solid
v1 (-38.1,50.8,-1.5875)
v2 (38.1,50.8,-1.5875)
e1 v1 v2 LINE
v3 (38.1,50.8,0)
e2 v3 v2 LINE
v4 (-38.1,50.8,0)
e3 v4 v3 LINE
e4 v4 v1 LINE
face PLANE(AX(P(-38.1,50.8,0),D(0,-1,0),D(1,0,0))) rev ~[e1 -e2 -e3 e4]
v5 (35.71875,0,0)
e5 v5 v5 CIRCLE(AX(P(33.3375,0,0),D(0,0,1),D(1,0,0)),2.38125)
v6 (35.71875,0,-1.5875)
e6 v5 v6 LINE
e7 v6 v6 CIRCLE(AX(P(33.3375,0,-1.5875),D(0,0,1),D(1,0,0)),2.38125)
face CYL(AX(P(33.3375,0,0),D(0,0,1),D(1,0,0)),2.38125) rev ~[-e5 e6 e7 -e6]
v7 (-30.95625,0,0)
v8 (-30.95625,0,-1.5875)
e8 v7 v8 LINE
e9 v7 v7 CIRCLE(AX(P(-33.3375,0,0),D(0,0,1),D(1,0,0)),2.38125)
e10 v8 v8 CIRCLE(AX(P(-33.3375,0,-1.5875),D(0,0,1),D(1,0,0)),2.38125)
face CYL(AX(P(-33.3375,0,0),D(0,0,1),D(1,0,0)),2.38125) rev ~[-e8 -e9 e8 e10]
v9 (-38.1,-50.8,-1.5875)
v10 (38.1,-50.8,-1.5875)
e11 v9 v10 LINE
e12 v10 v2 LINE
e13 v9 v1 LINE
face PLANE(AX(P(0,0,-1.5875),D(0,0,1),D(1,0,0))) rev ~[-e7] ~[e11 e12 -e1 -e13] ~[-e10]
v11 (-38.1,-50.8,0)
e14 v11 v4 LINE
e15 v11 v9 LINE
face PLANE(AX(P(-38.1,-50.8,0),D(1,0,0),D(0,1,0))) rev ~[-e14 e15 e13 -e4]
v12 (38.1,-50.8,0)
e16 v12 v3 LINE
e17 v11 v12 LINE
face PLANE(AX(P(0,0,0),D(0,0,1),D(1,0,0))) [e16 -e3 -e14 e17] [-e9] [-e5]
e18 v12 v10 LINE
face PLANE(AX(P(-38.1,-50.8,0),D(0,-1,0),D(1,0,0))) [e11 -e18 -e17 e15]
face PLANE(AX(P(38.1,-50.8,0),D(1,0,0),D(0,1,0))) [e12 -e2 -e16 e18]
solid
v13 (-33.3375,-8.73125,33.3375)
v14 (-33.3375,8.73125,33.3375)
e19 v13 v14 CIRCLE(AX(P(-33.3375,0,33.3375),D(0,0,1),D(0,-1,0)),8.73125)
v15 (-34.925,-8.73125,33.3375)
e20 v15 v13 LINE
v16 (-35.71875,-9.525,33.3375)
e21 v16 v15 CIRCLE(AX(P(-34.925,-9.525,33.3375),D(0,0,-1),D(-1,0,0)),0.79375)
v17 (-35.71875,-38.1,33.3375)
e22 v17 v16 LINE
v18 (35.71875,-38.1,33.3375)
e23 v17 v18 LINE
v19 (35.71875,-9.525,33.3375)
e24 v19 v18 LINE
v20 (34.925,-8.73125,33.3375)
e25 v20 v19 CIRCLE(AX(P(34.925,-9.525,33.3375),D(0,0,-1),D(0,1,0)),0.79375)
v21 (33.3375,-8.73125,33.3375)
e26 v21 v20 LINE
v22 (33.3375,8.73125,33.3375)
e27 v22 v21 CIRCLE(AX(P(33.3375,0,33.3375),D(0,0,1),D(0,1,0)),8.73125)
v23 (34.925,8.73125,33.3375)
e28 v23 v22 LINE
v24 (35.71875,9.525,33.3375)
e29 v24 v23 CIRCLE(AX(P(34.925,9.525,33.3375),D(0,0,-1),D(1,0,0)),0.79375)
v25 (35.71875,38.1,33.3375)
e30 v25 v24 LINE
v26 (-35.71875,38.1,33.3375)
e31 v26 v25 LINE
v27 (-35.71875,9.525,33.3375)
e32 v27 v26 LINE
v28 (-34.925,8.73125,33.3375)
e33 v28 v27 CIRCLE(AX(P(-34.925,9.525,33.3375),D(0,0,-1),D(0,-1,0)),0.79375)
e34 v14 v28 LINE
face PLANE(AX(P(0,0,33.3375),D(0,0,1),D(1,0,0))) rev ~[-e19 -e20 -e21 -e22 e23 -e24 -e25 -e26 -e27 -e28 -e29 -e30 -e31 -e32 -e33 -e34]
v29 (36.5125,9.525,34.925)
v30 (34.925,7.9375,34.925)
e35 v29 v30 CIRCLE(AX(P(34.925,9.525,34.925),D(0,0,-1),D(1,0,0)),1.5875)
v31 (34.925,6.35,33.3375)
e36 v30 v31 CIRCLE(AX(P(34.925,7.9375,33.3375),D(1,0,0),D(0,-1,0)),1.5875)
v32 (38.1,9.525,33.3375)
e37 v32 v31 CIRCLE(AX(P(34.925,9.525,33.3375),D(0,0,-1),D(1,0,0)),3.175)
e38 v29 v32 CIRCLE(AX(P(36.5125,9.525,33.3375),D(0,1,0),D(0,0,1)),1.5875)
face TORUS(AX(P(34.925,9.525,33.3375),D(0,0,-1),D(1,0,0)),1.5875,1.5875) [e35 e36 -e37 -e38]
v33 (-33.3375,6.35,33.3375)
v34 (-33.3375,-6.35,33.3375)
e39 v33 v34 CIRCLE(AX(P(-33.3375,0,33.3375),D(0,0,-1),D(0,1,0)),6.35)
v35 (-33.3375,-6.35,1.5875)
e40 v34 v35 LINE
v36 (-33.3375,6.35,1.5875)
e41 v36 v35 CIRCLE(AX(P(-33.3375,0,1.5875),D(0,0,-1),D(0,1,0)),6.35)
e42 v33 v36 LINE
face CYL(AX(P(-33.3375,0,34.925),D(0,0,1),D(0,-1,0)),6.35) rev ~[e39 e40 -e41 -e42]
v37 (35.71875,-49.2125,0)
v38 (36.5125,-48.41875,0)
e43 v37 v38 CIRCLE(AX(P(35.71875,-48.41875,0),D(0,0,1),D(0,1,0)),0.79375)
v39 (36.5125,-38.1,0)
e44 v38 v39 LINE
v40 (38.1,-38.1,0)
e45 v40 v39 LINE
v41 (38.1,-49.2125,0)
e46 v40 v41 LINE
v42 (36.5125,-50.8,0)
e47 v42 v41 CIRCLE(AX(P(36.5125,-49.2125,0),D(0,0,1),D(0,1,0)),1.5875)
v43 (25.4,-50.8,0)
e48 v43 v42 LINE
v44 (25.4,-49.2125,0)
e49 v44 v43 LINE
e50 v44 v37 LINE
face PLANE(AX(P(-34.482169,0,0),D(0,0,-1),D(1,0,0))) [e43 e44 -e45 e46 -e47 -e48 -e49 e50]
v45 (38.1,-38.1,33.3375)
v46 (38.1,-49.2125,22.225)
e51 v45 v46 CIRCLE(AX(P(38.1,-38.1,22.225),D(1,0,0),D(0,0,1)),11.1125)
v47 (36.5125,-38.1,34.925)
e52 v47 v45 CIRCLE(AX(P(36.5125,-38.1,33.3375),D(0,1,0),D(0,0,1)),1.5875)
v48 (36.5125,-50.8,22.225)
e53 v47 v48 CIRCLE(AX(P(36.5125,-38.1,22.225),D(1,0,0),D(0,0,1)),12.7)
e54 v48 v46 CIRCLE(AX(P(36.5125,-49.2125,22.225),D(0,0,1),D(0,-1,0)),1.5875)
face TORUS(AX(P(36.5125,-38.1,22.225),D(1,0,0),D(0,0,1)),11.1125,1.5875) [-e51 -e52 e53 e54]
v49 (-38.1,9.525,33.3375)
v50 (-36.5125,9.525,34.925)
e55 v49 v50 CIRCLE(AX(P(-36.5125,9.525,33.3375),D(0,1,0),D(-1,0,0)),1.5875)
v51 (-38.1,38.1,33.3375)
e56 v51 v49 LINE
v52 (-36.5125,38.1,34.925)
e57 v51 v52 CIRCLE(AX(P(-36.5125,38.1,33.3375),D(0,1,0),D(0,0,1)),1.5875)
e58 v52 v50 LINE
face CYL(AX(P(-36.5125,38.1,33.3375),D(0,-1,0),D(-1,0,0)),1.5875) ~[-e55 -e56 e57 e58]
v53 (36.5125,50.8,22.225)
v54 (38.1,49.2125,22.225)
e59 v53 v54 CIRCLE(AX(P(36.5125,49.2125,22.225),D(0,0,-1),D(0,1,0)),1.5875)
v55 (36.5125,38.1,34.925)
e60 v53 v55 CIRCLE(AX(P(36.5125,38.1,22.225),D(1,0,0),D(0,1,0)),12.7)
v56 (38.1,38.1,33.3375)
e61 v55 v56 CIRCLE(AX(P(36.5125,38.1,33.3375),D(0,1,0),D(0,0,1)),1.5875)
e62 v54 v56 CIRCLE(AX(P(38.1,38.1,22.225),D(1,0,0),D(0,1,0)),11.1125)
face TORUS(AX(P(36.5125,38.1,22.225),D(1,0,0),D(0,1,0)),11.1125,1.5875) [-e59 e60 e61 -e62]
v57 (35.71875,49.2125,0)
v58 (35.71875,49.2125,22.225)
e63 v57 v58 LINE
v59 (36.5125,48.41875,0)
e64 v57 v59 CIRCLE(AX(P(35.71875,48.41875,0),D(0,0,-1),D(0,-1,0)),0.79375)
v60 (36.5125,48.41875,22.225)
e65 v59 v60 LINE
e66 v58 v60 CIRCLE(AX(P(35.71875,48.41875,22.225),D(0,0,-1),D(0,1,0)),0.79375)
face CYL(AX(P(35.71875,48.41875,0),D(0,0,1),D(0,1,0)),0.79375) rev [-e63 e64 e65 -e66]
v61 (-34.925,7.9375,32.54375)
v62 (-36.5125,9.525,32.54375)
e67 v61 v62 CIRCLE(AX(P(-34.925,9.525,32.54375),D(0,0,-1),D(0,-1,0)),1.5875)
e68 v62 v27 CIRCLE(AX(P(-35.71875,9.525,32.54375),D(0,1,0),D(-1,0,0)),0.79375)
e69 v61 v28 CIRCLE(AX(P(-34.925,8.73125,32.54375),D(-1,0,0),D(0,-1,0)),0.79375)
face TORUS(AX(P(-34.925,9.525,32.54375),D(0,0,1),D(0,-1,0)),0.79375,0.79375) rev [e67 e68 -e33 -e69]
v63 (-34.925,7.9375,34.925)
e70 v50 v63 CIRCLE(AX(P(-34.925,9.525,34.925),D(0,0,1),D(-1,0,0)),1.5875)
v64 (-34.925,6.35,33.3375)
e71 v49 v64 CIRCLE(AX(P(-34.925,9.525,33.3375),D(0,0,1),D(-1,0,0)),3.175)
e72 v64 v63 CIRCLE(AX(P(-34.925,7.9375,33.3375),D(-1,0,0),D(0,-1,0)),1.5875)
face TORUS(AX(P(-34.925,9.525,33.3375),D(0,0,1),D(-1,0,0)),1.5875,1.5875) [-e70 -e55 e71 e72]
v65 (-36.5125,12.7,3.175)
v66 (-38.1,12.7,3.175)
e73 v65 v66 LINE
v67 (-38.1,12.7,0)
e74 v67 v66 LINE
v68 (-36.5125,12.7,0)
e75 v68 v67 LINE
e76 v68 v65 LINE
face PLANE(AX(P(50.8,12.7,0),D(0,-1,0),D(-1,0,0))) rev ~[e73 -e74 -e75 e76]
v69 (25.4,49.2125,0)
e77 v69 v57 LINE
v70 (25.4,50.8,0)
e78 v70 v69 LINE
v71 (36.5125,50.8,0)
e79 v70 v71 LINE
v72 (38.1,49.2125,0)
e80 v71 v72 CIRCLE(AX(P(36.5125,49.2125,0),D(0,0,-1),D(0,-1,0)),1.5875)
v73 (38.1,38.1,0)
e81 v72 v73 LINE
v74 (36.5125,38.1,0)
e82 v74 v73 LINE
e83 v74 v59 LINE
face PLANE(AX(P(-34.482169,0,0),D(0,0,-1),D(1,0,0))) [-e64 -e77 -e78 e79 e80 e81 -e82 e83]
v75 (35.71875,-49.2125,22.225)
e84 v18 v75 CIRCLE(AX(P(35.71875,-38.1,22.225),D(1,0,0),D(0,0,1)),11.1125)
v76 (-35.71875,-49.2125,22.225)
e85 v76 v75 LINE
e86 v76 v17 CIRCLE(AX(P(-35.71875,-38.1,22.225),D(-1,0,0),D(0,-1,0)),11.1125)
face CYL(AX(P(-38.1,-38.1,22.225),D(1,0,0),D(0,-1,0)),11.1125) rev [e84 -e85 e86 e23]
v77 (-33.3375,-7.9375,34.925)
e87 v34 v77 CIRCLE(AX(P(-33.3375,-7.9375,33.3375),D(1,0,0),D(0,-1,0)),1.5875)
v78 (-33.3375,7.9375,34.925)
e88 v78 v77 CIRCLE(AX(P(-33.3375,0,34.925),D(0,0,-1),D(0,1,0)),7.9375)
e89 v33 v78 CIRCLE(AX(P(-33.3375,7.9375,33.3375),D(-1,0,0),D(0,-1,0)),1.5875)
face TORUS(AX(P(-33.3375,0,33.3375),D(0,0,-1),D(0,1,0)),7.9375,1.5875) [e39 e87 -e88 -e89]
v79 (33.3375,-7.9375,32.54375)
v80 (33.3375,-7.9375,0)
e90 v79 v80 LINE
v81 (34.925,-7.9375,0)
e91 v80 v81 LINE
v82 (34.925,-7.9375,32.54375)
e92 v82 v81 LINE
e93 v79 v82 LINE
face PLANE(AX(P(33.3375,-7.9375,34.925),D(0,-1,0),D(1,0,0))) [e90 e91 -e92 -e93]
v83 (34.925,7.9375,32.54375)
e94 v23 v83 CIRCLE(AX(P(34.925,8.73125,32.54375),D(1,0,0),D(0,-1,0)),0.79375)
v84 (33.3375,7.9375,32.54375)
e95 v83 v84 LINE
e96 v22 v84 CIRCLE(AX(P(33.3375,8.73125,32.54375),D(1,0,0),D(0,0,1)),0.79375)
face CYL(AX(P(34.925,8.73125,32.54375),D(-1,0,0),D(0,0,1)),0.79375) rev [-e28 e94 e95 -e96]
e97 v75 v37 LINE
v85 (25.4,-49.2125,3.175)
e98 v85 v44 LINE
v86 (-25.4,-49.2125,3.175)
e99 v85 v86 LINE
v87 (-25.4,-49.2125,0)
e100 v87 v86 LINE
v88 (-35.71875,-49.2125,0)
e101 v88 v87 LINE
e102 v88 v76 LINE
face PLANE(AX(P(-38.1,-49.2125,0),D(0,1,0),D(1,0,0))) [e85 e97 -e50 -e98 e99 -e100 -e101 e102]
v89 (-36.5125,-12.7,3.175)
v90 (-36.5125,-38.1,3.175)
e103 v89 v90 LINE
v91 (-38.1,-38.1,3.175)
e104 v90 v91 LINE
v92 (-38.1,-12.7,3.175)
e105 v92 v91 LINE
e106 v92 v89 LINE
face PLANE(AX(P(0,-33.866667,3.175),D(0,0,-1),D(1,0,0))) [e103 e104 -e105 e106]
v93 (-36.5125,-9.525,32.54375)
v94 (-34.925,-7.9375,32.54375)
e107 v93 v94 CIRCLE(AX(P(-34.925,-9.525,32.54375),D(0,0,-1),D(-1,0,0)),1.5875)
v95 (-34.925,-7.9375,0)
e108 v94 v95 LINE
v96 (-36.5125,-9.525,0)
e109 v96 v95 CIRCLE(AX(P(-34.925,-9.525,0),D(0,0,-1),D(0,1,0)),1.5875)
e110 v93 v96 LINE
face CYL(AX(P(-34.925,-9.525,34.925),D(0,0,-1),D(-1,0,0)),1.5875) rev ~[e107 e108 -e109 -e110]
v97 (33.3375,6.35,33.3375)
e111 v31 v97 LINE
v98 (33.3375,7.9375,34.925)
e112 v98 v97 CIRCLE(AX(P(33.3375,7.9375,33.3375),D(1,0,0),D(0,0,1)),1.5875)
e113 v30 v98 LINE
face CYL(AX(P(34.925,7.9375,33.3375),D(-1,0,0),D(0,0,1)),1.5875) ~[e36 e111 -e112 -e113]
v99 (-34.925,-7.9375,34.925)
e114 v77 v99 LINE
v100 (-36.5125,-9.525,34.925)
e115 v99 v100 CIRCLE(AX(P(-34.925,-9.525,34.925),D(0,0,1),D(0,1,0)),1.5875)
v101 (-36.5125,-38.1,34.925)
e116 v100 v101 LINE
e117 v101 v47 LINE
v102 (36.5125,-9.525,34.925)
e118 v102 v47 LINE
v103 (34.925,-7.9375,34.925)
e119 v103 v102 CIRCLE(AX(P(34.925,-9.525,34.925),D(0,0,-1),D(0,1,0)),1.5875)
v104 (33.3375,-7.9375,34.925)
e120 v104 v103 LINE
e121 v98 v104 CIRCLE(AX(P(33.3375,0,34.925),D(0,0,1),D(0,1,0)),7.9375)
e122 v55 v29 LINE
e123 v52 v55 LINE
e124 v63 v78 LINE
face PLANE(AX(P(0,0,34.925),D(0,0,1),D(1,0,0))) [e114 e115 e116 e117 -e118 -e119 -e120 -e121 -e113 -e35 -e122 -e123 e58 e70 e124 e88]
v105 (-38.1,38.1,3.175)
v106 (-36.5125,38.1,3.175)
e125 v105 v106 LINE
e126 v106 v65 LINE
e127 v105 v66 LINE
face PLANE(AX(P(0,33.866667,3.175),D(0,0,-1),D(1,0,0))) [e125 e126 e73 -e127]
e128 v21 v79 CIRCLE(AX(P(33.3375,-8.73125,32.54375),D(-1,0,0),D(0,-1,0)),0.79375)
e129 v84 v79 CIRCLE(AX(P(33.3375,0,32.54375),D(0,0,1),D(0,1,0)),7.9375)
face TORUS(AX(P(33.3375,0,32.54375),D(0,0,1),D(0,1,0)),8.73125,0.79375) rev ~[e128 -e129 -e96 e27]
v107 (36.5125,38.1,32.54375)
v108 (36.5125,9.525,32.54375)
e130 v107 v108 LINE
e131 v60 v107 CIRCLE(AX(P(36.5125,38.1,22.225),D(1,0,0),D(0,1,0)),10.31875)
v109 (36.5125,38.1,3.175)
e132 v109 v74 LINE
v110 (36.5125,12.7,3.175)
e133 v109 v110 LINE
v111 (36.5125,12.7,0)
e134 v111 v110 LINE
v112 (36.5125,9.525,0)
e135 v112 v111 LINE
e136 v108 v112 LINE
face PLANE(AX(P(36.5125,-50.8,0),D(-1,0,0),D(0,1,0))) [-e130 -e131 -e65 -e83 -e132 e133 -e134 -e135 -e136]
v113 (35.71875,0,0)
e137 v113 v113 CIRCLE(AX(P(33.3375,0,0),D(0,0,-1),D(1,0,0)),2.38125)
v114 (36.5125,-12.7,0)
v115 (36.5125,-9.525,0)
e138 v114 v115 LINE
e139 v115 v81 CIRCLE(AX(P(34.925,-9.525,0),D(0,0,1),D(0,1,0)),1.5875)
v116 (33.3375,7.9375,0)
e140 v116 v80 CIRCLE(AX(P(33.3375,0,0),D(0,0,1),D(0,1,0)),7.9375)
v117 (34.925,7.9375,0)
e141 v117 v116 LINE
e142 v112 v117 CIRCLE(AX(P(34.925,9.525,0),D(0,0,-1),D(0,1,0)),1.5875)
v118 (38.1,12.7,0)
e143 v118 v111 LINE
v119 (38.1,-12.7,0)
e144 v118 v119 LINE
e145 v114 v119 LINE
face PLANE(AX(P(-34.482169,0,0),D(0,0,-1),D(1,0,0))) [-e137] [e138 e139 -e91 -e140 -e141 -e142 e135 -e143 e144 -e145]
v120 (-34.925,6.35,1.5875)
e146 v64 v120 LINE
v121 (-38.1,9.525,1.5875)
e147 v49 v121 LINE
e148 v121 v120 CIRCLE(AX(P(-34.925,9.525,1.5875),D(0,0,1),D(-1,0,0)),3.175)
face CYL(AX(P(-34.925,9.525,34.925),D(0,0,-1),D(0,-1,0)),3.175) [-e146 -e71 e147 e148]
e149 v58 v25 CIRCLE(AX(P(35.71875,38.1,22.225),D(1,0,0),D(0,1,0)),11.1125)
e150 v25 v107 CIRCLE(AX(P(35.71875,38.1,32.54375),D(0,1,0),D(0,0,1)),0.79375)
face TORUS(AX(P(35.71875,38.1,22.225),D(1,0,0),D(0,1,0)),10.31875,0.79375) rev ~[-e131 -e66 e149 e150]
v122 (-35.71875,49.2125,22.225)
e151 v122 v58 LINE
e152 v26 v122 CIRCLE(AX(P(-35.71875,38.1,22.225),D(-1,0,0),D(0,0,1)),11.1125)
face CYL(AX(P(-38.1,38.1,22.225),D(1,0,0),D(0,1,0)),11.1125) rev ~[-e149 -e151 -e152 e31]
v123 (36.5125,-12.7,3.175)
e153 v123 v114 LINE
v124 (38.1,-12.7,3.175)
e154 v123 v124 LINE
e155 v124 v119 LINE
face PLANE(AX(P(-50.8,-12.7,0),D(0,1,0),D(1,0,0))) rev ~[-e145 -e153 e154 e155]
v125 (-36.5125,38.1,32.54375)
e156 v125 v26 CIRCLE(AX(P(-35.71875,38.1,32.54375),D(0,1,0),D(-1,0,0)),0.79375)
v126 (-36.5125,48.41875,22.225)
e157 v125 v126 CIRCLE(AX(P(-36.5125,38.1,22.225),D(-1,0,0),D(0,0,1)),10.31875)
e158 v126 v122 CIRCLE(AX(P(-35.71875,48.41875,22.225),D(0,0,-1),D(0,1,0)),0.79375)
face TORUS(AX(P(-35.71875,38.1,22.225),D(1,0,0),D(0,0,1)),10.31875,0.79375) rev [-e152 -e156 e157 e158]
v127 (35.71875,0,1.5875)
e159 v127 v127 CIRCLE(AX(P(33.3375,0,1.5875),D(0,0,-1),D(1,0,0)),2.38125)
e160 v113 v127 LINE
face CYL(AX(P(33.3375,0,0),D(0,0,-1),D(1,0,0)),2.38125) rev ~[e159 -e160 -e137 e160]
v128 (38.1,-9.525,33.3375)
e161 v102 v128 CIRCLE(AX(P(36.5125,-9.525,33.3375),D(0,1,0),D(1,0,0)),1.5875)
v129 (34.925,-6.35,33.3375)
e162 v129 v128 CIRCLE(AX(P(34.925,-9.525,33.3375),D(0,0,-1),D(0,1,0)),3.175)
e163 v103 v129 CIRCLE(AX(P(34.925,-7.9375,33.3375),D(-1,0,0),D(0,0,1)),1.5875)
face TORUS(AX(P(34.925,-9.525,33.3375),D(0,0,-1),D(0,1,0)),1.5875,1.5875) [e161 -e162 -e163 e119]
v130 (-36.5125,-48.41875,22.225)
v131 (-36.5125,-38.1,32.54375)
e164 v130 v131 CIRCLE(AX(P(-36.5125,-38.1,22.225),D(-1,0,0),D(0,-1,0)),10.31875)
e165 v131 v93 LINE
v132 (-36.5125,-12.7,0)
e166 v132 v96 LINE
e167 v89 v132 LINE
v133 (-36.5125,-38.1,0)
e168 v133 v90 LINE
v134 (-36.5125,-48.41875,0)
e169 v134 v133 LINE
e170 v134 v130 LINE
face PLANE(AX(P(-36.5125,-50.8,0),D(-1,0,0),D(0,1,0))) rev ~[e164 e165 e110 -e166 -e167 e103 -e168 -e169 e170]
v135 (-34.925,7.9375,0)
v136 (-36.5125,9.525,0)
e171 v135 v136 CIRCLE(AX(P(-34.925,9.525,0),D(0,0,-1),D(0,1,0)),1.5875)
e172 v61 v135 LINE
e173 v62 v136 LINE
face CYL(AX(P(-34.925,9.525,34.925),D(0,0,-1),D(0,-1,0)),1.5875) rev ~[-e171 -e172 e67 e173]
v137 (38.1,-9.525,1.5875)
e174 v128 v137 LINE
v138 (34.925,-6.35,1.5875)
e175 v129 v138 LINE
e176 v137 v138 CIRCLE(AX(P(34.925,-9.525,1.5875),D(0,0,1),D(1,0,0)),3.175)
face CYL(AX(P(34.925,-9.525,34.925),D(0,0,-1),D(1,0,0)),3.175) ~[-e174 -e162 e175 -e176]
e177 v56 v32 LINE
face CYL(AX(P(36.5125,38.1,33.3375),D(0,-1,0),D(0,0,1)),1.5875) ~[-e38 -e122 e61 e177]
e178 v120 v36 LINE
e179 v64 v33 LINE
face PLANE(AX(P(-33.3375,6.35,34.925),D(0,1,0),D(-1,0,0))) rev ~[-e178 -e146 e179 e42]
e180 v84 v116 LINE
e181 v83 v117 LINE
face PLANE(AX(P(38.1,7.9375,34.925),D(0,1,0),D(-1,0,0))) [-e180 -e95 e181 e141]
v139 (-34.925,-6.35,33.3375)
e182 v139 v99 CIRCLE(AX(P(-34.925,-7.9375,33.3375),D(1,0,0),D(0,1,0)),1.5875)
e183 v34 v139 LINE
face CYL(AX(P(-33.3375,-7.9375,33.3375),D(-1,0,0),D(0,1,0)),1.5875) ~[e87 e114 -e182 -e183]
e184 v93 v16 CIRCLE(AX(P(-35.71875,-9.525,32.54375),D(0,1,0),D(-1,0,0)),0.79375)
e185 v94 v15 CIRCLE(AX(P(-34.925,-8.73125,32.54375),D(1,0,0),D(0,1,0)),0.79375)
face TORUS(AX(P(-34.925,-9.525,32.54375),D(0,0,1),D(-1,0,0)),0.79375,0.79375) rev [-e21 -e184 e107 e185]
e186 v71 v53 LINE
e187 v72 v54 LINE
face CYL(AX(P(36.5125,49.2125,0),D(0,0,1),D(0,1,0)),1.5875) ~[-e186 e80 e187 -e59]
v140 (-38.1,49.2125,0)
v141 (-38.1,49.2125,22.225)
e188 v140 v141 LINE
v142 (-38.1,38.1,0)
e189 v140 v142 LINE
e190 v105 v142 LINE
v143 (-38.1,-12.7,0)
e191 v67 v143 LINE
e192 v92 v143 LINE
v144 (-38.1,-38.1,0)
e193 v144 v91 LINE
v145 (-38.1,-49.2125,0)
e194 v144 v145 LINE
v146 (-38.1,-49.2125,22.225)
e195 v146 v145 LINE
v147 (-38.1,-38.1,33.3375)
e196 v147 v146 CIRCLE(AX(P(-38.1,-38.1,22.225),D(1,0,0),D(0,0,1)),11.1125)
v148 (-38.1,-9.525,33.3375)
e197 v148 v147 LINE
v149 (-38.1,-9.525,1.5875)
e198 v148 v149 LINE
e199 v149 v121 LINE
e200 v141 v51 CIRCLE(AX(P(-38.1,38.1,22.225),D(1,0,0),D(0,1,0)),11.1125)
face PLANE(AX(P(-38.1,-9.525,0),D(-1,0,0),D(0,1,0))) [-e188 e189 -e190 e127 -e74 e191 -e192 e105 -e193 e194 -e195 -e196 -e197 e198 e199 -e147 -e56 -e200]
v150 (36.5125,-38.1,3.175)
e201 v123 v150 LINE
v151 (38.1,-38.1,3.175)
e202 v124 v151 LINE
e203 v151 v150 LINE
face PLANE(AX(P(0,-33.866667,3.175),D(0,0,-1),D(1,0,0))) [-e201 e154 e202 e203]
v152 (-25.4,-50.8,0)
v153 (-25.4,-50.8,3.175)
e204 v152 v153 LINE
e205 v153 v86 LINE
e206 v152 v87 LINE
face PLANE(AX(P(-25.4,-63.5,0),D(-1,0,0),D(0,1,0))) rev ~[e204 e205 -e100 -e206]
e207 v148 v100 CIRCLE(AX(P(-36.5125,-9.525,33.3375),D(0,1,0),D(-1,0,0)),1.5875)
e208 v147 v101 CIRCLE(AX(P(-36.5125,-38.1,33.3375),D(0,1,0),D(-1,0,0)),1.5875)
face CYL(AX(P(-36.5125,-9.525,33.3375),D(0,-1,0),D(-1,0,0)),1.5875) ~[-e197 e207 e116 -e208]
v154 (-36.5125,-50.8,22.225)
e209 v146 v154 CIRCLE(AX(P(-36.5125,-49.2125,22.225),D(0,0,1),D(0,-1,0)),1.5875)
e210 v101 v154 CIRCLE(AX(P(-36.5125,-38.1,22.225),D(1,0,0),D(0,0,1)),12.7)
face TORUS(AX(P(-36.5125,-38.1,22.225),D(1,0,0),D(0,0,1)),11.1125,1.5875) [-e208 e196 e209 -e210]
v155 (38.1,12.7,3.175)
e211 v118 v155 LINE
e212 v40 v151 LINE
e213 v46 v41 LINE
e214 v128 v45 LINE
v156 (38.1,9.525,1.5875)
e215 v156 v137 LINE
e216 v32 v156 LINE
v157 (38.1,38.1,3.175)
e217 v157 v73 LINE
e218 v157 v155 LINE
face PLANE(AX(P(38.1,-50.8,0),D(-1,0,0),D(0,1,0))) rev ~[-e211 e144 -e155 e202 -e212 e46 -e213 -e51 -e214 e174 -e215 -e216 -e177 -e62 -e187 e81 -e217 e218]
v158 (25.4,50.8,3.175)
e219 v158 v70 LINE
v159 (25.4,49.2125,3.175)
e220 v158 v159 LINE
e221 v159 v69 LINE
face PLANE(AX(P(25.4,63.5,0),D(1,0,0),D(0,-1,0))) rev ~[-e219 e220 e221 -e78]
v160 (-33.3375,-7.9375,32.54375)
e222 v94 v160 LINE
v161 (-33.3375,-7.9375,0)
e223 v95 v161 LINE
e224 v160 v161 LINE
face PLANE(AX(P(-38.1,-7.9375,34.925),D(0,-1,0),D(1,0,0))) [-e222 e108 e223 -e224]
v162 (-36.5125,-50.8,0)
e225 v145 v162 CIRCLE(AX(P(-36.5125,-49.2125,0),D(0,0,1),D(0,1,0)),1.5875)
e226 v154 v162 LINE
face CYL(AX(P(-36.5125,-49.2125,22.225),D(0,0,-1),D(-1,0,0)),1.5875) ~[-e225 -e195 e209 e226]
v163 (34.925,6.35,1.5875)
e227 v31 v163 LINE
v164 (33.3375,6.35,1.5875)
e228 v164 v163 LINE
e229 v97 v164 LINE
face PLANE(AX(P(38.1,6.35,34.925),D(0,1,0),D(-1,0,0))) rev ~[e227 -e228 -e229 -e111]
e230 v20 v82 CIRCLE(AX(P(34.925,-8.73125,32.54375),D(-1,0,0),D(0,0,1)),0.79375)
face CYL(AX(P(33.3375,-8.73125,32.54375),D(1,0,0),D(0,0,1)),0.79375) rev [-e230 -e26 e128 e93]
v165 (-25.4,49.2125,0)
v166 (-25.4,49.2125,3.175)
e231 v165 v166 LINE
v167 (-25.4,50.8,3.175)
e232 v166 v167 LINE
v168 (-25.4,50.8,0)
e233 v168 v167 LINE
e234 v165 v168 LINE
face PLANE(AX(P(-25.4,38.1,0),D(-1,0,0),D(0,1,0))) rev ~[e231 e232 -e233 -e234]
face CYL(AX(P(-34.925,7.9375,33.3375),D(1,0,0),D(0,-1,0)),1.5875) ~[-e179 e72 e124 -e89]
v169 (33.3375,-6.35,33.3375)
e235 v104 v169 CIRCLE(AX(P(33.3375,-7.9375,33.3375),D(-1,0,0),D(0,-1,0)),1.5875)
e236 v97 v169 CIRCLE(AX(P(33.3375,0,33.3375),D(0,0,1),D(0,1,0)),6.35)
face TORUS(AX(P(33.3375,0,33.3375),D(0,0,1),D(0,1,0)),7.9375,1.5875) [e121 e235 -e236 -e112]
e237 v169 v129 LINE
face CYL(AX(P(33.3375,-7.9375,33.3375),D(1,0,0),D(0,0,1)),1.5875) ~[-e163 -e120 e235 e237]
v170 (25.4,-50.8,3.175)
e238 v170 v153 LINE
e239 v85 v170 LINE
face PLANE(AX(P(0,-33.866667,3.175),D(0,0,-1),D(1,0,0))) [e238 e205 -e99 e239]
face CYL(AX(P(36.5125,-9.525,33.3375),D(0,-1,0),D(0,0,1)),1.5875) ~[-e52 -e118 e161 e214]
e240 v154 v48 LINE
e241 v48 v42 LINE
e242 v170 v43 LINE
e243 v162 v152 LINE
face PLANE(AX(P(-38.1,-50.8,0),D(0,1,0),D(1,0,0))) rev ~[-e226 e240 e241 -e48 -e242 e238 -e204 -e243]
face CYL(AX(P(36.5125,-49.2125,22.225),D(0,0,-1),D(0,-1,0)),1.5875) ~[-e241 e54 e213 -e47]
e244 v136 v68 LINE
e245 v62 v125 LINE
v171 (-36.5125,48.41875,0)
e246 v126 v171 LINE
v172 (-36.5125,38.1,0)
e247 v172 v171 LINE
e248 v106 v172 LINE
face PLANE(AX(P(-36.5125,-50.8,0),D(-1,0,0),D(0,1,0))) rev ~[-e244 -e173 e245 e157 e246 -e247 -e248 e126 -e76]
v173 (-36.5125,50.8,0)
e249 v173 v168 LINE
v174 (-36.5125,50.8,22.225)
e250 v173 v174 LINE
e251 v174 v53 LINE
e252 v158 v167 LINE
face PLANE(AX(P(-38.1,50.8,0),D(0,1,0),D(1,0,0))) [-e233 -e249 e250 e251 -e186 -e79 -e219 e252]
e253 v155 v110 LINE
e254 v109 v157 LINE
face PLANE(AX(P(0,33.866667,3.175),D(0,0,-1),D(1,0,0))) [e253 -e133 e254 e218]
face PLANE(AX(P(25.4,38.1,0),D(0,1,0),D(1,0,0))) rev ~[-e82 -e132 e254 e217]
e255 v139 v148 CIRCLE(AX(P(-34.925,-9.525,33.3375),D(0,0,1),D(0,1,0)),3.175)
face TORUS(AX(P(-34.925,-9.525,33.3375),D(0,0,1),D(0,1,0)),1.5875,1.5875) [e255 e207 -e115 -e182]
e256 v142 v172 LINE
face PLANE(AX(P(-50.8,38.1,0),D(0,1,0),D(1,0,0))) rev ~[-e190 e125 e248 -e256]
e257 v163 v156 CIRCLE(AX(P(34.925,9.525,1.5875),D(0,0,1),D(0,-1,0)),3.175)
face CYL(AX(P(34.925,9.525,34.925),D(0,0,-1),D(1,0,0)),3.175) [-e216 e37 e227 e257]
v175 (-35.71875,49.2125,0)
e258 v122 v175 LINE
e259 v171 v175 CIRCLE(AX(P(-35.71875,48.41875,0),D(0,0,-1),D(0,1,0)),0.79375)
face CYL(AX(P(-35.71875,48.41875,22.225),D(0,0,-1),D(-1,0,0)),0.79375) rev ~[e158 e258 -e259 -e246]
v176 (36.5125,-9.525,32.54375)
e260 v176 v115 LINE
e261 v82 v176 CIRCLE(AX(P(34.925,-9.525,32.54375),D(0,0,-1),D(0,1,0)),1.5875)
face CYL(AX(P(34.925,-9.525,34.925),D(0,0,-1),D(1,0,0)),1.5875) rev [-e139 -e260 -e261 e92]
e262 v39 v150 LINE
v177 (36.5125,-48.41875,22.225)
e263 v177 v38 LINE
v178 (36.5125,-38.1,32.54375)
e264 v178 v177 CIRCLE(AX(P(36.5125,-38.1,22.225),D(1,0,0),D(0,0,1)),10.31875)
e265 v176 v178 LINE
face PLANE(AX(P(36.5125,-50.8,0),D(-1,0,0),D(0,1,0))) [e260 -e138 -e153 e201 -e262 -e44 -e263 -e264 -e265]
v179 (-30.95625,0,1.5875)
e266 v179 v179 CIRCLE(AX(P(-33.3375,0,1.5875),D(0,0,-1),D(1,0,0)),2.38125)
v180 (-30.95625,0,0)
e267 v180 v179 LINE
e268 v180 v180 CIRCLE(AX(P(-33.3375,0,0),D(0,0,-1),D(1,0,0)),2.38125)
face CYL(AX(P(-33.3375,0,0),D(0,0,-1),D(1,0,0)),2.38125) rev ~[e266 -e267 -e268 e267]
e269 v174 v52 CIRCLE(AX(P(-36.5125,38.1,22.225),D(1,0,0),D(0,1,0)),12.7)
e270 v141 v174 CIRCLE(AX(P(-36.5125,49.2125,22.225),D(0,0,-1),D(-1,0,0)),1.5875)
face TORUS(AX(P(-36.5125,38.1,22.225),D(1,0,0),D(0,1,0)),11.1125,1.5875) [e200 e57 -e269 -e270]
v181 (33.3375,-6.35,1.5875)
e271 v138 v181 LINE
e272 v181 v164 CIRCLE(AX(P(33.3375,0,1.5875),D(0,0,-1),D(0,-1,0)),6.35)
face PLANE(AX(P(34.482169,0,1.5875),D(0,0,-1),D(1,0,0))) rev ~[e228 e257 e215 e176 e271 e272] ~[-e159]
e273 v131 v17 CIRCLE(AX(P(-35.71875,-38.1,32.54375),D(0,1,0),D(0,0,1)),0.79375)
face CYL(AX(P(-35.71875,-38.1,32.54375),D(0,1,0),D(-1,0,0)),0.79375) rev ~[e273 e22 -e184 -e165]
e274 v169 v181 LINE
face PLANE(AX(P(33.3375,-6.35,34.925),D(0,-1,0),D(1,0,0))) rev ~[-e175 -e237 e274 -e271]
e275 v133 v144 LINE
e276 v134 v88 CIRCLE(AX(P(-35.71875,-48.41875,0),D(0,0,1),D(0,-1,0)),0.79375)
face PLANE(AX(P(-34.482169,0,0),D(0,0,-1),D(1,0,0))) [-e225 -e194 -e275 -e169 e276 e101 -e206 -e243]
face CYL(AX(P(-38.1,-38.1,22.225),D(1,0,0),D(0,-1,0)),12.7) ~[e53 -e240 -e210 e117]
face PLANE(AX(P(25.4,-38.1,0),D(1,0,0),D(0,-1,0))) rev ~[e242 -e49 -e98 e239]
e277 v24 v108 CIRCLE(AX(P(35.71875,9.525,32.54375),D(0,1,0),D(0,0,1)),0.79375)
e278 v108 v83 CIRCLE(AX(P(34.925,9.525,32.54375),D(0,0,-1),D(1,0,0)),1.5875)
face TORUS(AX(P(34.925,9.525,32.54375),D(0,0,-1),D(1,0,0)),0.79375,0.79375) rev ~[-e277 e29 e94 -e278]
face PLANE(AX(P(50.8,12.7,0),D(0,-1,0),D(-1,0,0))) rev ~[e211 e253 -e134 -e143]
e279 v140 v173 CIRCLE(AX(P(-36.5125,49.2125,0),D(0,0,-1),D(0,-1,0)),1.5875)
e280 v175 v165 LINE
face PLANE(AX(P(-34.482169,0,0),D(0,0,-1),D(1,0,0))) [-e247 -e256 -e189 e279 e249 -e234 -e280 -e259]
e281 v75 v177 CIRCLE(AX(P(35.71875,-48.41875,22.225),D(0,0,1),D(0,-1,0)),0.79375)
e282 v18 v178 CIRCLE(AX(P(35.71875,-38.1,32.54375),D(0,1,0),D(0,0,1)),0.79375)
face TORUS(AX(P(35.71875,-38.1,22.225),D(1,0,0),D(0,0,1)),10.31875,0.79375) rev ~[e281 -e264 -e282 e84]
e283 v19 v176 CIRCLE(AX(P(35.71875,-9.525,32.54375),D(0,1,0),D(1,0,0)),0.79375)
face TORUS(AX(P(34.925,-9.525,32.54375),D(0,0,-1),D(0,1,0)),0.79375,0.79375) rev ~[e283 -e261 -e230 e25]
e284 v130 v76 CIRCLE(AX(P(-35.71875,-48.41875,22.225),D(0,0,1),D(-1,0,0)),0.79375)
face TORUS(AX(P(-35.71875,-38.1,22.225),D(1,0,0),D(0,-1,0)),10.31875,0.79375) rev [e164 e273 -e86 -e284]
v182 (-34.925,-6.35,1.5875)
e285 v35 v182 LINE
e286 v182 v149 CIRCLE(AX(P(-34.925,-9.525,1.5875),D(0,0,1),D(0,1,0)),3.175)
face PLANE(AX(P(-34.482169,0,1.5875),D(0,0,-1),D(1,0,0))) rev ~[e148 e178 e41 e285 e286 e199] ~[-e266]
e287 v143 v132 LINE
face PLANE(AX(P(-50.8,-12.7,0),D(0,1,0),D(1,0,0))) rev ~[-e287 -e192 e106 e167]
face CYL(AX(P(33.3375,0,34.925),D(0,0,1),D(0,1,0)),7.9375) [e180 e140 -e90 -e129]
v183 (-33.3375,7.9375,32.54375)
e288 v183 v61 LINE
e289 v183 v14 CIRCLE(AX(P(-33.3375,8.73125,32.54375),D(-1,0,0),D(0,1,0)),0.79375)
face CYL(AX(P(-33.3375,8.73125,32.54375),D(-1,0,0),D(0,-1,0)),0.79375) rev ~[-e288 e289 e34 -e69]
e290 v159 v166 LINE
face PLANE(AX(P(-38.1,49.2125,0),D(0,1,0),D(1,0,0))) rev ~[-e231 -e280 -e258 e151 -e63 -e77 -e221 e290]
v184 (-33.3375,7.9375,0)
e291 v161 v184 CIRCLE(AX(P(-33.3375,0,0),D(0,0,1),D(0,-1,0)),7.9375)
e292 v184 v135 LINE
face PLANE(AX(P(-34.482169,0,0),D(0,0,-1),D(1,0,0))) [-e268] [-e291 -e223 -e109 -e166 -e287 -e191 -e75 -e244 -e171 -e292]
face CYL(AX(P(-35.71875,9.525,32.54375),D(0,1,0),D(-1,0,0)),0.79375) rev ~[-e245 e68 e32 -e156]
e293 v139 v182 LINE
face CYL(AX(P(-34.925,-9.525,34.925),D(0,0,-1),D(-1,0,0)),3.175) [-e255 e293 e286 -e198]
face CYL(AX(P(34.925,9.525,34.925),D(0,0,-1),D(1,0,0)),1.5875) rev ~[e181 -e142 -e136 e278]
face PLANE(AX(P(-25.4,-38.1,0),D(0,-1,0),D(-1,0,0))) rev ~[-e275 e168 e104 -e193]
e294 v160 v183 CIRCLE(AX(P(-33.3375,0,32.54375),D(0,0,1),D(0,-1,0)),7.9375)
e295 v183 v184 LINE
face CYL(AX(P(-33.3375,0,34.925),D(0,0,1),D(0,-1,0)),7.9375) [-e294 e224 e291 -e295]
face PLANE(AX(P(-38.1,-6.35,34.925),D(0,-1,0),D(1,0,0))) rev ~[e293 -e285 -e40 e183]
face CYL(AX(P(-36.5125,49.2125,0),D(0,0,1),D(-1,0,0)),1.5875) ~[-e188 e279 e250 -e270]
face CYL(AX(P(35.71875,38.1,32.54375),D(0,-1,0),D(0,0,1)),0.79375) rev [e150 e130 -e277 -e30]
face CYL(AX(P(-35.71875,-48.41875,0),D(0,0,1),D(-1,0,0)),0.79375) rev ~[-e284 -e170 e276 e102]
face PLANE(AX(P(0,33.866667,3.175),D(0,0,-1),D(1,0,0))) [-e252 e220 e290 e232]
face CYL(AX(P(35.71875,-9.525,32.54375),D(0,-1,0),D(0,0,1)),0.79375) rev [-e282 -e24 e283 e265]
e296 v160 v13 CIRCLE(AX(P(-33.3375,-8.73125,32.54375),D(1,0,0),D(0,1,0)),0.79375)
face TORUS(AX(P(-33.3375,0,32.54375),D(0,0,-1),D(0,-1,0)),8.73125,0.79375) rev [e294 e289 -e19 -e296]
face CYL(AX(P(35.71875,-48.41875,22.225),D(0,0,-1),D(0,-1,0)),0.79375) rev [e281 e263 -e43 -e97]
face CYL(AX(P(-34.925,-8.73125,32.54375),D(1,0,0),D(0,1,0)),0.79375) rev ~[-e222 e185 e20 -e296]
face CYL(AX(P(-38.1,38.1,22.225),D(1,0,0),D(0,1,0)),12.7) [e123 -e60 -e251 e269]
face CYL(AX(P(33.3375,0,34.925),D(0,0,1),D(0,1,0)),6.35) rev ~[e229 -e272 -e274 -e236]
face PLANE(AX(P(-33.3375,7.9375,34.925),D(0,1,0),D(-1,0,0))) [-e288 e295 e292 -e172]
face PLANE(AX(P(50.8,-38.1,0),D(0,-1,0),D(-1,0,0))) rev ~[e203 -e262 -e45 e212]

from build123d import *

# Parameters (mm, degrees)
F0_W      = 76.2
F0_H      = 101.6
F1_DEPTH  = 1.5875
F2_R      = 2.38125
F3_DEPTH  = 1.5885
F4_W      = 76.2
F4_H      = 101.6
F5_DEPTH  = 34.925
F6_R      = 12.7
F8_DEPTH  = 36.5135
F9_R      = 3.175
F10_T     = -1.5875
F11_R     = 1.5875
F12_R     = 0.79375
F14_DEPTH = 1.5875
F15_R     = 2.38125
F16_DEPTH = 25.4
F18_DEPTH = 3.175


with BuildPart() as f1:
    # F0 (on Top) → F1 (new body)
    with BuildSketch(Plane.XY):
        Rectangle(F0_W, F0_H)
    extrude(amount=-F1_DEPTH)

    # F2 (on face) → F3 (cut, through all)
    with BuildSketch(Plane.XY):
        with Locations((33.3375, 0)):
            Circle(F2_R)
        with Locations((-33.3375, 0)):
            Circle(F2_R)
    extrude(amount=-F3_DEPTH, mode=Mode.SUBTRACT)


with BuildPart() as f5:
    # F4 (on face) → F5 (new body)
    with BuildSketch(Plane.XY):
        Rectangle(F4_W, F4_H)
    extrude(amount=F5_DEPTH)

    # F6
    f6_edges = [f5.edges().sort_by_distance(p)[0] for p in [
        (0, -50.8, 34.925),
        (0, 50.8, 34.925),
    ]]
    fillet(f6_edges, radius=F6_R)

    # F7 (on face) → F8 (cut, through all)
    with BuildSketch(Plane.XY.offset(34.925)):
        with BuildLine():
            Line((-33.3375, 6.35), (-38.1, 6.35))
            Line((-38.1, 6.35), (-38.1, -6.35))
            Line((-38.1, -6.35), (-33.3375, -6.35))
            ThreePointArc((-33.3375, -6.35), (-26.9875, 0), (-33.3375, 6.35))
        make_face()
        with BuildLine():
            Line((38.1, -6.35), (38.1, 6.35))
            Line((38.1, 6.35), (33.3375, 6.35))
            ThreePointArc((33.3375, 6.35), (26.9875, 0), (33.3375, -6.35))
            Line((33.3375, -6.35), (38.1, -6.35))
        make_face()
    extrude(amount=-F8_DEPTH, mode=Mode.SUBTRACT)

    # F9
    f9_edges = [f5.edges().sort_by_distance(p)[0] for p in [
        (38.1, -6.35, 17.4625),
        (38.1, 6.35, 17.4625),
        (-38.1, -6.35, 17.4625),
        (-38.1, 6.35, 17.4625),
    ]]
    fillet(f9_edges, radius=F9_R)

    # F10
    f10_openings = [f5.faces().sort_by_distance(p)[0] for p in [
        (0, 0, 0),
    ]]
    offset(amount=F10_T, openings=f10_openings)

    # F11
    f11_edges = [f5.edges().sort_by_distance(p)[0] for p in [
        (-38.1, 50.8, 11.1125),
        (38.1, 50.8, 11.1125),
        (38.1, -50.8, 11.1125),
        (38.1, -23.8125, 34.925),
        (38.1, -47.080256, 31.205256),
        (37.170064, -7.279936, 34.925),
        (-38.1, -50.8, 11.1125),
        (-38.1, -23.8125, 34.925),
        (-37.170064, -7.279936, 34.925),
        (-34.13125, -6.35, 34.925),
        (-26.9875, 0, 34.925),
        (-34.13125, 6.35, 34.925),
        (34.13125, -6.35, 34.925),
        (-37.170064, 7.279936, 34.925),
        (26.9875, 0, 34.925),
        (-38.1, 23.8125, 34.925),
        (34.13125, 6.35, 34.925),
        (37.170064, 7.279936, 34.925),
        (38.1, 23.8125, 34.925),
        (-38.1, -47.080256, 31.205256),
        (-38.1, 47.080256, 31.205256),
        (38.1, 47.080256, 31.205256),
    ]]
    fillet(f11_edges, radius=F11_R)

    # F12
    f12_edges = [f5.edges().sort_by_distance(p)[0] for p in [
        (-36.5125, 49.2125, 11.1125),
        (36.5125, 49.2125, 11.1125),
        (-36.5125, -23.8125, 33.3375),
        (-36.5125, -45.957724, 30.082724),
        (-36.5125, -49.2125, 11.1125),
        (-36.047532, -8.402468, 33.3375),
        (-34.13125, -7.9375, 33.3375),
        (-25.4, 0, 33.3375),
        (-34.13125, 7.9375, 33.3375),
        (-36.047532, 8.402468, 33.3375),
        (-36.5125, 45.957724, 30.082724),
        (-36.5125, 23.8125, 33.3375),
        (36.5125, 23.8125, 33.3375),
        (36.5125, 45.957724, 30.082724),
        (36.047532, 8.402468, 33.3375),
        (34.13125, 7.9375, 33.3375),
        (25.4, 0, 33.3375),
        (34.13125, -7.9375, 33.3375),
        (36.047532, -8.402468, 33.3375),
        (36.5125, -49.2125, 11.1125),
        (36.5125, -45.957724, 30.082724),
        (36.5125, -23.8125, 33.3375),
    ]]
    fillet(f12_edges, radius=F12_R)

    # F13 (on face) → F14 (join)
    with BuildSketch(Plane(origin=(0, 0, 0), x_dir=(1, 0, 0), z_dir=(0, 0, -1))):
        with BuildLine():
            ThreePointArc((-34.925, 6.35), (-37.1700640303, 7.2799359697), (-38.1, 9.525))
            Line((-38.1, 9.525), (-38.1, -9.525))
            ThreePointArc((-38.1, -9.525), (-37.1700640303, -7.2799359697), (-34.925, -6.35))
            Line((-34.925, -6.35), (-33.3375, -6.35))
            ThreePointArc((-33.3375, -6.35), (-26.9875, 0), (-33.3375, 6.35))
            Line((-33.3375, 6.35), (-34.925, 6.35))
        make_face()
        with BuildLine():
            ThreePointArc((38.1, 9.525), (37.1700640303, 7.2799359697), (34.925, 6.35))
            Line((34.925, 6.35), (33.3375, 6.35))
            ThreePointArc((33.3375, 6.35), (26.9875, 0), (33.3375, -6.35))
            Line((33.3375, -6.35), (34.925, -6.35))
            ThreePointArc((34.925, -6.35), (37.1700640303, -7.2799359697), (38.1, -9.525))
            Line((38.1, -9.525), (38.1, 9.525))
        make_face()
    extrude(amount=-F14_DEPTH)

    # F15 (on face) → F16 (cut)
    with BuildSketch(Plane(origin=(0, 0, 0), x_dir=(1, 0, 0), z_dir=(0, 0, -1))):
        with Locations((-33.3375, 0)):
            Circle(F15_R)
        with Locations((33.3375, 0)):
            Circle(F15_R)
    extrude(amount=-F16_DEPTH, mode=Mode.SUBTRACT)

    # F17 (on face) → F18 (cut)
    with BuildSketch(Plane(origin=(0, 0, 0), x_dir=(1, 0, 0), z_dir=(0, 0, -1))):
        Polygon((25.4, 63.5), (-25.4, 63.5), (-25.4, 38.1), (-50.8, 38.1), (-50.8, 12.7), (50.8, 12.7), (50.8, 38.1), (25.4, 38.1), align=None)
        Polygon((25.4, -63.5), (25.4, -38.1), (50.8, -38.1), (50.8, -12.7), (-50.8, -12.7), (-50.8, -38.1), (-25.4, -38.1), (-25.4, -63.5), align=None)
    extrude(amount=-F18_DEPTH, mode=Mode.SUBTRACT)


solid = Compound([f1.part, f5.part])
